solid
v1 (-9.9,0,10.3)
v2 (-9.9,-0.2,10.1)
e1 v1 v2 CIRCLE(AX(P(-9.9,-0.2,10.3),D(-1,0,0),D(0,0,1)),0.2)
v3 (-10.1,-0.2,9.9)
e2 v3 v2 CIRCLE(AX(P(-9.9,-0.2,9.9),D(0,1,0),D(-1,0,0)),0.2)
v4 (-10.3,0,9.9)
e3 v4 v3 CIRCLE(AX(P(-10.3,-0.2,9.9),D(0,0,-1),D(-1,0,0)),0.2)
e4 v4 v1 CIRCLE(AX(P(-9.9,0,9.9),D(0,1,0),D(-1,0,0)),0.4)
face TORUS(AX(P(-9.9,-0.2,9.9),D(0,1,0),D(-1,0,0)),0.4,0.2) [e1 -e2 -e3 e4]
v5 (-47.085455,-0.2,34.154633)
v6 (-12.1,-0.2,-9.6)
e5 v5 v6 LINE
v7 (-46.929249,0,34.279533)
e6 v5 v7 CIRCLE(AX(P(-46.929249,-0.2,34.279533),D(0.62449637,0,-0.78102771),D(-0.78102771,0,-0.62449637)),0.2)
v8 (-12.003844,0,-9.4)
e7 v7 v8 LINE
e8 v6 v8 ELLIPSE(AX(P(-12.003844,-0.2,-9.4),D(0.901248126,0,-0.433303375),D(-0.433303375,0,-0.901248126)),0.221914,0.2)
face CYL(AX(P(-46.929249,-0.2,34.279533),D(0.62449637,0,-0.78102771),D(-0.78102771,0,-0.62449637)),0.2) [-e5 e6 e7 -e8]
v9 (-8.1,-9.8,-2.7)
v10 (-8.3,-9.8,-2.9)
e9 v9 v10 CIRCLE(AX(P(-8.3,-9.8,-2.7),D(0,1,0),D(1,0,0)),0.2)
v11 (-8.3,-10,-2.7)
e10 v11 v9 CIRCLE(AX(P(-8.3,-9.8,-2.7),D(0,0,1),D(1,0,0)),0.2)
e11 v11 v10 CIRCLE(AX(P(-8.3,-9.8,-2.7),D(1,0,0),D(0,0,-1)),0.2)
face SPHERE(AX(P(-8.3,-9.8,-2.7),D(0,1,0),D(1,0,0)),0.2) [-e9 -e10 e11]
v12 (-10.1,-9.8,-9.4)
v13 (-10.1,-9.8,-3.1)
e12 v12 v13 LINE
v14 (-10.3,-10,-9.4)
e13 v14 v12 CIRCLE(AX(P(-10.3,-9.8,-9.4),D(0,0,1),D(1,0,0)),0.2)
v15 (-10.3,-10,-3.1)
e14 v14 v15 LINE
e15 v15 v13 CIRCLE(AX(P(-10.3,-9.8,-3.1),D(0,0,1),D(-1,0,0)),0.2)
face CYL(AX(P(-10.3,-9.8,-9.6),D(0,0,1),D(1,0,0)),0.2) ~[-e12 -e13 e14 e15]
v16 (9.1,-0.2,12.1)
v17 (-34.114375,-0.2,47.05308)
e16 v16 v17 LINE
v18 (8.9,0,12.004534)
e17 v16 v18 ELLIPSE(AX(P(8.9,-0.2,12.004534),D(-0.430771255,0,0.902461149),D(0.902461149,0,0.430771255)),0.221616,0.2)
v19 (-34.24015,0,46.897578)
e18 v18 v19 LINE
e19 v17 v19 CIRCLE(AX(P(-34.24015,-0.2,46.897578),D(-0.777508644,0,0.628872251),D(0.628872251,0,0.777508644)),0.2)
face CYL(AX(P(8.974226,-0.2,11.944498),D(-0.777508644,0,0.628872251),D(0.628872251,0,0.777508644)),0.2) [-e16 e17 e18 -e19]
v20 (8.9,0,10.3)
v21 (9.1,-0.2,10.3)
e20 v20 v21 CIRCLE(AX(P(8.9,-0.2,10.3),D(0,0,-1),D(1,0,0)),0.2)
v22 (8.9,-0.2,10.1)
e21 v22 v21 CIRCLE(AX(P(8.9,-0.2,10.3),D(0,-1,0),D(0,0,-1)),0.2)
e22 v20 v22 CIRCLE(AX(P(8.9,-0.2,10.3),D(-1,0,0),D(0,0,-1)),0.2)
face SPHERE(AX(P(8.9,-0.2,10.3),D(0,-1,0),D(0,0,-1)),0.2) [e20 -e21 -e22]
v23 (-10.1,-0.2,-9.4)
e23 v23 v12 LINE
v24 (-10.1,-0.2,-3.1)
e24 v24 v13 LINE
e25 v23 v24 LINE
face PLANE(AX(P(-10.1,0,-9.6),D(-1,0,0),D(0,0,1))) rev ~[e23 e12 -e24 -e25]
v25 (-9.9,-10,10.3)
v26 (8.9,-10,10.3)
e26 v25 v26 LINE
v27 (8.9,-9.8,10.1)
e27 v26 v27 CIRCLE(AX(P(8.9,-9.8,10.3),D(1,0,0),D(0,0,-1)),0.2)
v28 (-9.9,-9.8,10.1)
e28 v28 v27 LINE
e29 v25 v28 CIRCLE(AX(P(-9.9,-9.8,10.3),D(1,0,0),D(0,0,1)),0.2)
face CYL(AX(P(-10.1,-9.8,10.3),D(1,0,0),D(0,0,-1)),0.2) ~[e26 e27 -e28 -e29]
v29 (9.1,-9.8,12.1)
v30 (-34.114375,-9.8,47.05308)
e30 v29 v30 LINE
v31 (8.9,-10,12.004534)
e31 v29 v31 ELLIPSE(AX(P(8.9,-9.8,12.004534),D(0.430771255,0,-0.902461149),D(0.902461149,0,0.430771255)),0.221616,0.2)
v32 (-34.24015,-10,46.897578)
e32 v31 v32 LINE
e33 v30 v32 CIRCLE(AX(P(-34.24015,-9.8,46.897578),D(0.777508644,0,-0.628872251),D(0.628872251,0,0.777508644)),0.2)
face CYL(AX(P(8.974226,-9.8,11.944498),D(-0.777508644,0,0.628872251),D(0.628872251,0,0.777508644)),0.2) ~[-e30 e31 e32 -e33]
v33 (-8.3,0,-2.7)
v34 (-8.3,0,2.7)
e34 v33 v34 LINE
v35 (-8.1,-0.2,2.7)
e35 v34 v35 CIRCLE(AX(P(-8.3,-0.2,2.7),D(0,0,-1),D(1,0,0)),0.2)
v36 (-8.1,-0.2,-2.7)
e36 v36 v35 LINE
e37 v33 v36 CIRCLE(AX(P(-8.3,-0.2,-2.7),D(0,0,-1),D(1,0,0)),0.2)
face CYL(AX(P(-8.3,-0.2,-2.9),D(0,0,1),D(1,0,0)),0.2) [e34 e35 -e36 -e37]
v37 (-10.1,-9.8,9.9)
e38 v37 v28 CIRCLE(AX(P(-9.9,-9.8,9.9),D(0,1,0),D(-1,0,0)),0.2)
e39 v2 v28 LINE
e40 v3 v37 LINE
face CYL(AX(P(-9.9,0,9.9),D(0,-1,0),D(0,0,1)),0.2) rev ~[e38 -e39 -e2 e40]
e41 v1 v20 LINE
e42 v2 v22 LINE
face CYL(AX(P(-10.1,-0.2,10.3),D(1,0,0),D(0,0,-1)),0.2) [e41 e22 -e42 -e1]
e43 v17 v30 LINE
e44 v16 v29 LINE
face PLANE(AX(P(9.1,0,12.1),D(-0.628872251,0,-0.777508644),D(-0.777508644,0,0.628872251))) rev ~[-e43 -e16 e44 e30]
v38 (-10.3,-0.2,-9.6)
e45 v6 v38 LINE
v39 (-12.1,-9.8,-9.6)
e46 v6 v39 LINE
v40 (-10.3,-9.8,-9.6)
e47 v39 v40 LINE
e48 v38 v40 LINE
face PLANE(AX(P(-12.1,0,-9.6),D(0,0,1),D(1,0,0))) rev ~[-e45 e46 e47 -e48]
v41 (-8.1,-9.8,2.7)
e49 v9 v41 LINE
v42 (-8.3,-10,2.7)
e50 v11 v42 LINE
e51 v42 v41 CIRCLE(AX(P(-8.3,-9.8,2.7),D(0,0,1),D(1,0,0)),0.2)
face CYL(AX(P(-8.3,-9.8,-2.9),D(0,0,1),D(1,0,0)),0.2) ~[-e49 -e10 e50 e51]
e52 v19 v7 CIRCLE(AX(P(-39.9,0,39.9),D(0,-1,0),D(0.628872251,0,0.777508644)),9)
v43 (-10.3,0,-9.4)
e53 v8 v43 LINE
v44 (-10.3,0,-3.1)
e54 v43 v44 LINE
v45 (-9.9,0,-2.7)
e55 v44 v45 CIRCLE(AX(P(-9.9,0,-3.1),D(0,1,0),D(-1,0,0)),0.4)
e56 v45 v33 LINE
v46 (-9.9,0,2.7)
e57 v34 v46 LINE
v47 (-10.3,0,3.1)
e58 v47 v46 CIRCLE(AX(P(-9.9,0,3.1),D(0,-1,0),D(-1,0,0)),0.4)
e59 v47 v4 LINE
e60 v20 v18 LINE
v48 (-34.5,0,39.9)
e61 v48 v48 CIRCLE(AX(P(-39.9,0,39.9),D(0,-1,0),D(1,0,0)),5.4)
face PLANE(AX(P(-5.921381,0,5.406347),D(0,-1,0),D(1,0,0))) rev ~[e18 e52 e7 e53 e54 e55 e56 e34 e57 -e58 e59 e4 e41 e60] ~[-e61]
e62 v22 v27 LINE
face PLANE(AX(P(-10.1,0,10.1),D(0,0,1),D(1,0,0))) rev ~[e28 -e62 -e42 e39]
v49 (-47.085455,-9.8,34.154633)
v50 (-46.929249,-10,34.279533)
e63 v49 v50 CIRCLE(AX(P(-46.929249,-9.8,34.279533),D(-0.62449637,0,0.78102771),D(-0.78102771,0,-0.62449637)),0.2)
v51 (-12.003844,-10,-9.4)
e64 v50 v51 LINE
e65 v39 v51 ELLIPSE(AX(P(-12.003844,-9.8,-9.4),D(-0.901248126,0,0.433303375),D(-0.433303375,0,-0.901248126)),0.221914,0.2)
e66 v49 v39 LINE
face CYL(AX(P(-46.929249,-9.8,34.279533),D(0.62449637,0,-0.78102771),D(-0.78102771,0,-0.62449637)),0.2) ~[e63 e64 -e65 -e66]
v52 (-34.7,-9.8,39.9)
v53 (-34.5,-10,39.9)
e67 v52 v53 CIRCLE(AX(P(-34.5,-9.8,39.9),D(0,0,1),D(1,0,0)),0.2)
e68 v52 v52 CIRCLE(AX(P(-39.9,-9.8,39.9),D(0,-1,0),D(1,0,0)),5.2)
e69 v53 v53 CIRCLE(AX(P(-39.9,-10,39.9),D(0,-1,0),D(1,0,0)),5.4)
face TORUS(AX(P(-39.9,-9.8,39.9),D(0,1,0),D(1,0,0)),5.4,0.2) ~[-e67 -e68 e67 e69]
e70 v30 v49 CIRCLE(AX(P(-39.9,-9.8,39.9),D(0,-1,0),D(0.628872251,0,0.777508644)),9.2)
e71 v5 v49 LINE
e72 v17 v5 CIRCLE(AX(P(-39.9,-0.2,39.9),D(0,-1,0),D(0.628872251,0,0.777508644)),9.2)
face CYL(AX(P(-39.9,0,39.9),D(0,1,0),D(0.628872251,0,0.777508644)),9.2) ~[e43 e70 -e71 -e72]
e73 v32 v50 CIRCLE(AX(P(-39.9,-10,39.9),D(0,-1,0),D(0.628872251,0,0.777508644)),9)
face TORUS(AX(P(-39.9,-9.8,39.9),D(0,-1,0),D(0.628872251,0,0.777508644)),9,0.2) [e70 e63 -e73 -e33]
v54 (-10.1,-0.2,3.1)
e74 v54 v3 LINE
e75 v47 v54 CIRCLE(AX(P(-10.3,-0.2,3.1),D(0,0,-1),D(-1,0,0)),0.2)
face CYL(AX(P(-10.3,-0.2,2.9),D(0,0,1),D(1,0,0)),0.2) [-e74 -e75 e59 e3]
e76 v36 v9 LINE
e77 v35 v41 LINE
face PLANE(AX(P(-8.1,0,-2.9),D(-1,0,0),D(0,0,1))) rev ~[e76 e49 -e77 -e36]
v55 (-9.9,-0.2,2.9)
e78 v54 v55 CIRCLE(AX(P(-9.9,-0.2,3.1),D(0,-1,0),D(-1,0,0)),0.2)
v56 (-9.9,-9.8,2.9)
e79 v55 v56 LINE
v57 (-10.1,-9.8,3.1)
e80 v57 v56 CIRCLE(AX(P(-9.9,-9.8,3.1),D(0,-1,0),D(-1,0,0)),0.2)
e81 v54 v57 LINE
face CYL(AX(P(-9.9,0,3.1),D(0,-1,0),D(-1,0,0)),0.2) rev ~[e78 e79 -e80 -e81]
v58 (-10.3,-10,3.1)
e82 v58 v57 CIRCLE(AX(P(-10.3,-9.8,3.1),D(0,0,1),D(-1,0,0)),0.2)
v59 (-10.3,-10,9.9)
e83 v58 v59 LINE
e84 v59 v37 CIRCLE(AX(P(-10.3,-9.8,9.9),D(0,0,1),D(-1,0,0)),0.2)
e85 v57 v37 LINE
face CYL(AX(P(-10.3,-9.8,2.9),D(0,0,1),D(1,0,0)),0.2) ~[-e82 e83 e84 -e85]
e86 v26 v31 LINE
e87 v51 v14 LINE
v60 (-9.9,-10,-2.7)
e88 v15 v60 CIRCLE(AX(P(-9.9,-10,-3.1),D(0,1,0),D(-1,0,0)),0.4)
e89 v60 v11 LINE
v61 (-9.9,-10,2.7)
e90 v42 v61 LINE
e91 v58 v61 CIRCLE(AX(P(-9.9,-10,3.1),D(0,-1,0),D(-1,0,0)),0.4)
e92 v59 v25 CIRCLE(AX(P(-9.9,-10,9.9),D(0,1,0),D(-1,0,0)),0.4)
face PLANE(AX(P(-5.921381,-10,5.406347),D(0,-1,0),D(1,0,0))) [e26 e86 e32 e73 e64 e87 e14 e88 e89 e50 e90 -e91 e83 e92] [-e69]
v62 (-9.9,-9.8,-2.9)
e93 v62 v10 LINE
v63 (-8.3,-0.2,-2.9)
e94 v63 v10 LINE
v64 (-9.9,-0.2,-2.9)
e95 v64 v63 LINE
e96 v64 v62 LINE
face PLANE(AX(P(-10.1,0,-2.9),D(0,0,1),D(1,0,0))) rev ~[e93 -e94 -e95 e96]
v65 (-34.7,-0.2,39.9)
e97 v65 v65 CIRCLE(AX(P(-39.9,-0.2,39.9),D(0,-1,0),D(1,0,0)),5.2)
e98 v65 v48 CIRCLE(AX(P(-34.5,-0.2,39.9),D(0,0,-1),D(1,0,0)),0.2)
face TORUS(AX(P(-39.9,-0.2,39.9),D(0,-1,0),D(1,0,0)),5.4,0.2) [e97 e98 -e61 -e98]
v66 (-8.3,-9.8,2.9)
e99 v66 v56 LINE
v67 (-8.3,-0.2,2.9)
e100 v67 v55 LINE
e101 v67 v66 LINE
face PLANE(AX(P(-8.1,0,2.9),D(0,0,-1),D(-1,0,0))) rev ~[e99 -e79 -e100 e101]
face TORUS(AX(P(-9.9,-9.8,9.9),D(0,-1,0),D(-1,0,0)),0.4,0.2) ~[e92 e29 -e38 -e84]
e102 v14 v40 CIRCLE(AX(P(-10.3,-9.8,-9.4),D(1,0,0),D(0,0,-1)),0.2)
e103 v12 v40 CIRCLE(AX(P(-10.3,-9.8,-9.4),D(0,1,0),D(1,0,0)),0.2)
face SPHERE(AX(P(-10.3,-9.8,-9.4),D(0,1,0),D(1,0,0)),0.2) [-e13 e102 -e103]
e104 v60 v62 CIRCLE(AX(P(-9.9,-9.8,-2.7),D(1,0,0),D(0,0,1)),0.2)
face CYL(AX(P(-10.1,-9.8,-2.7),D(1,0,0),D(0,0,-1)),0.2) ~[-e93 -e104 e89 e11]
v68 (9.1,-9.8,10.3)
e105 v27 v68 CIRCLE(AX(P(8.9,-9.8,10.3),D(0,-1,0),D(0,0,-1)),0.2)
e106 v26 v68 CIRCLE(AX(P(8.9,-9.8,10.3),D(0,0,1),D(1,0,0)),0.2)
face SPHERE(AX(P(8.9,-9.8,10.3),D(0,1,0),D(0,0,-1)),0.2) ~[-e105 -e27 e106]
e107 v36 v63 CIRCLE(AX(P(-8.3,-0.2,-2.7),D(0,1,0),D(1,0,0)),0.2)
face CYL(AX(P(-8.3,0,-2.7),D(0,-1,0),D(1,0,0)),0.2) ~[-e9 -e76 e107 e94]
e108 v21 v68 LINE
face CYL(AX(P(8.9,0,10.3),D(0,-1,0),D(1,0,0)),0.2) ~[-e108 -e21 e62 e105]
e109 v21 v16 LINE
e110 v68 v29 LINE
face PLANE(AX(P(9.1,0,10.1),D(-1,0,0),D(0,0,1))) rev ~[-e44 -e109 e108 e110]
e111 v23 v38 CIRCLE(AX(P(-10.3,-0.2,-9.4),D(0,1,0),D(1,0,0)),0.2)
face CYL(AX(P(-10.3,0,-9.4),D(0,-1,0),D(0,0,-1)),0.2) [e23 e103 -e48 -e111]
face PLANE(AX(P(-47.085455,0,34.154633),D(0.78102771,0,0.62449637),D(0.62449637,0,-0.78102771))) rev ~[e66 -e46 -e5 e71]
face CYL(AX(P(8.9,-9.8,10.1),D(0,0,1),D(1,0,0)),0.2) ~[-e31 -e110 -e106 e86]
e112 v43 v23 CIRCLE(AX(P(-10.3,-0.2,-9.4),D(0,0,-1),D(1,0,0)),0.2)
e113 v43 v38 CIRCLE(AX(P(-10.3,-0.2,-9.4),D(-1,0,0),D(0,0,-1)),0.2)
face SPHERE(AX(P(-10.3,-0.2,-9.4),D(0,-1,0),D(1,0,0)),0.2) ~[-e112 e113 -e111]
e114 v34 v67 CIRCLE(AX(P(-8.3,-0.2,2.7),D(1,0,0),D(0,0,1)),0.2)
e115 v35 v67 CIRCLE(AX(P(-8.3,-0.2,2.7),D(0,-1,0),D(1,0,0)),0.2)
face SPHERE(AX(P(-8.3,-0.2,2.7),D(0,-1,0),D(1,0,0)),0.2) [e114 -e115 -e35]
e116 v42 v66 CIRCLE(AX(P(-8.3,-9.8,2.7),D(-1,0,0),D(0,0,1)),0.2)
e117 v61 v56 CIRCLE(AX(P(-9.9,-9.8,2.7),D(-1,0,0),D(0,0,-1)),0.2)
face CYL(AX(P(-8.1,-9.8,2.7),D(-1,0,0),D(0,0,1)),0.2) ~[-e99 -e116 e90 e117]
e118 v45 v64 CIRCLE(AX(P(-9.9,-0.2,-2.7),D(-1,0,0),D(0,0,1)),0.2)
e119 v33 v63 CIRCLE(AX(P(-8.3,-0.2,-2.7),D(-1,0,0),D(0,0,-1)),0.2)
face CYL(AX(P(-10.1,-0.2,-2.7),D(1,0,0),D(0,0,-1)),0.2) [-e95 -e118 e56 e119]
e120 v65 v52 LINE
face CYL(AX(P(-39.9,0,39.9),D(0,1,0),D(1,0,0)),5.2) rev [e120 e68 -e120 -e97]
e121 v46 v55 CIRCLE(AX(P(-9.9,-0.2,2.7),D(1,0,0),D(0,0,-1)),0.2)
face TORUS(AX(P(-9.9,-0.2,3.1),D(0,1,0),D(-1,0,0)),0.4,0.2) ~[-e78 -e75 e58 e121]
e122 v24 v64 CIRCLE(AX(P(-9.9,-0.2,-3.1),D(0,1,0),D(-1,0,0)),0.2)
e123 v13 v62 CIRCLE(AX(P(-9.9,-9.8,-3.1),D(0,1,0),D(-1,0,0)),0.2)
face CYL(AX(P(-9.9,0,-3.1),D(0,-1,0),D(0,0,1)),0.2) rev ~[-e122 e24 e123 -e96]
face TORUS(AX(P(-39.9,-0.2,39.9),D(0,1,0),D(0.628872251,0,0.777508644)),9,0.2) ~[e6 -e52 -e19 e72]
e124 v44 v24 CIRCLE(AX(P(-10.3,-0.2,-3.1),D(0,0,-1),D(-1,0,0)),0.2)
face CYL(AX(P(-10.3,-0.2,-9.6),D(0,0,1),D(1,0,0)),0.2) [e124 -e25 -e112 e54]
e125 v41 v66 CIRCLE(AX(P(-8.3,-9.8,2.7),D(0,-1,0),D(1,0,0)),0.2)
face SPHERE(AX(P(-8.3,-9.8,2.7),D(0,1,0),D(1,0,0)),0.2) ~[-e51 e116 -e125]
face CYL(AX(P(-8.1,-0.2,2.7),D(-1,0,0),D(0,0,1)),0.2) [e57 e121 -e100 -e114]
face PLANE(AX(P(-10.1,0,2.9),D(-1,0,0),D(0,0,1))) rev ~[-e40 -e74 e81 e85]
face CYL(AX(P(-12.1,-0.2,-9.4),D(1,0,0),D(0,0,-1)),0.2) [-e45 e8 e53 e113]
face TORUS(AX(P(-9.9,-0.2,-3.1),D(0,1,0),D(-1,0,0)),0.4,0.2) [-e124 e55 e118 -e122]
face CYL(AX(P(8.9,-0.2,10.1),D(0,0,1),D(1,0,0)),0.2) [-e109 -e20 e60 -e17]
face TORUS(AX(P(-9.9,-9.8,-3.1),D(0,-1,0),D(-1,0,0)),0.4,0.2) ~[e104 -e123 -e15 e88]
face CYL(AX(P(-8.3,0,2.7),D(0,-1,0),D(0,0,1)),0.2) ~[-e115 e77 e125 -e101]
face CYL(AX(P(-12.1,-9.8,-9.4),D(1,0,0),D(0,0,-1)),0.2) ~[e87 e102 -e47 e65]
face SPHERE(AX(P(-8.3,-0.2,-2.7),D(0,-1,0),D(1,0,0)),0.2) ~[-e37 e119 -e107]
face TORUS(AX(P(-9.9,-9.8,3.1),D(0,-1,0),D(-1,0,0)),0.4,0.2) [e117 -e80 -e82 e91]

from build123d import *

# Parameters (mm, degrees)
F0_R     = 5.2
F1_DEPTH = 10
F2_R     = 0.2


with BuildPart() as f1:
    # F0 (on Front) → F1 (new body)
    with BuildSketch(Plane.XZ):
        Polygon((2.9, 10.1), (9.1, 10.1), (9.1, 12.1), (-12.1, 12.1), (-12.1, -9.6), (-10.1, -9.6), (-10.1, -2.9), (-8.1, -2.9), (-8.1, 2.9), (-10.1, 2.9), (-10.1, 10.1), (-2.9, 10.1), align=None)
        with BuildLine():
            Line((-12.1, 12.1), (9.1, 12.1))
            Line((9.1, 12.1), (-34.1143752893, 47.0530795261))
            ThreePointArc((-34.1143752893, 47.0530795261), (-31.5973574285, 43.863095549), (-30.7, 39.9))
            ThreePointArc((-30.7, 39.9), (-36.8558404571, 31.2182321686), (-47.0854549299, 34.1546333929))
            Line((-47.0854549299, 34.1546333929), (-12.1, -9.6))
            Line((-12.1, -9.6), (-12.1, 12.1))
        make_face()
        with BuildLine():
            ThreePointArc((-30.7, 39.9), (-31.5973574285, 43.863095549), (-34.1143752893, 47.0530795261))
            ThreePointArc((-34.1143752893, 47.0530795261), (-46.3870917462, 46.4236217454), (-47.0854549299, 34.1546333929))
            ThreePointArc((-47.0854549299, 34.1546333929), (-36.8558404571, 31.2182321686), (-30.7, 39.9))
        make_face()
        with Locations((-39.9, 39.9)):
            Circle(F0_R, mode=Mode.SUBTRACT)
    extrude(amount=F1_DEPTH)

    # F2
    f2_edges = [f1.edges().sort_by_distance(p)[0] for p in [
        (-8.1, -5, -2.9),
        (-8.1, -5, 2.9),
        (-8.1, 0, 0),
        (-8.1, -10, 0),
        (-10.1, -5, 2.9),
        (-10.1, -5, 10.1),
        (-10.1, 0, 6.5),
        (-10.1, -10, 6.5),
        (-10.1, -5, -9.6),
        (-10.1, -5, -2.9),
        (-10.1, 0, -6.25),
        (-10.1, -10, -6.25),
        (9.1, -5, 10.1),
        (-0.5, 0, 10.1),
        (-0.5, -10, 10.1),
        (9.1, 0, 11.1),
        (-12.507188, 0, 29.57654),
        (-46.387092, 0, 46.423622),
        (-29.592727, 0, 12.277317),
        (-11.1, 0, -9.6),
        (-9.1, 0, -2.9),
        (-9.1, 0, 2.9),
        (-45.1, 0, 39.9),
        (9.1, -10, 11.1),
        (-12.507188, -10, 29.57654),
        (-46.387092, -10, 46.423622),
        (-29.592727, -10, 12.277317),
        (-11.1, -10, -9.6),
        (-9.1, -10, -2.9),
        (-9.1, -10, 2.9),
        (-45.1, -10, 39.9),
    ]]
    fillet(f2_edges, radius=F2_R)


solid = f1.part
